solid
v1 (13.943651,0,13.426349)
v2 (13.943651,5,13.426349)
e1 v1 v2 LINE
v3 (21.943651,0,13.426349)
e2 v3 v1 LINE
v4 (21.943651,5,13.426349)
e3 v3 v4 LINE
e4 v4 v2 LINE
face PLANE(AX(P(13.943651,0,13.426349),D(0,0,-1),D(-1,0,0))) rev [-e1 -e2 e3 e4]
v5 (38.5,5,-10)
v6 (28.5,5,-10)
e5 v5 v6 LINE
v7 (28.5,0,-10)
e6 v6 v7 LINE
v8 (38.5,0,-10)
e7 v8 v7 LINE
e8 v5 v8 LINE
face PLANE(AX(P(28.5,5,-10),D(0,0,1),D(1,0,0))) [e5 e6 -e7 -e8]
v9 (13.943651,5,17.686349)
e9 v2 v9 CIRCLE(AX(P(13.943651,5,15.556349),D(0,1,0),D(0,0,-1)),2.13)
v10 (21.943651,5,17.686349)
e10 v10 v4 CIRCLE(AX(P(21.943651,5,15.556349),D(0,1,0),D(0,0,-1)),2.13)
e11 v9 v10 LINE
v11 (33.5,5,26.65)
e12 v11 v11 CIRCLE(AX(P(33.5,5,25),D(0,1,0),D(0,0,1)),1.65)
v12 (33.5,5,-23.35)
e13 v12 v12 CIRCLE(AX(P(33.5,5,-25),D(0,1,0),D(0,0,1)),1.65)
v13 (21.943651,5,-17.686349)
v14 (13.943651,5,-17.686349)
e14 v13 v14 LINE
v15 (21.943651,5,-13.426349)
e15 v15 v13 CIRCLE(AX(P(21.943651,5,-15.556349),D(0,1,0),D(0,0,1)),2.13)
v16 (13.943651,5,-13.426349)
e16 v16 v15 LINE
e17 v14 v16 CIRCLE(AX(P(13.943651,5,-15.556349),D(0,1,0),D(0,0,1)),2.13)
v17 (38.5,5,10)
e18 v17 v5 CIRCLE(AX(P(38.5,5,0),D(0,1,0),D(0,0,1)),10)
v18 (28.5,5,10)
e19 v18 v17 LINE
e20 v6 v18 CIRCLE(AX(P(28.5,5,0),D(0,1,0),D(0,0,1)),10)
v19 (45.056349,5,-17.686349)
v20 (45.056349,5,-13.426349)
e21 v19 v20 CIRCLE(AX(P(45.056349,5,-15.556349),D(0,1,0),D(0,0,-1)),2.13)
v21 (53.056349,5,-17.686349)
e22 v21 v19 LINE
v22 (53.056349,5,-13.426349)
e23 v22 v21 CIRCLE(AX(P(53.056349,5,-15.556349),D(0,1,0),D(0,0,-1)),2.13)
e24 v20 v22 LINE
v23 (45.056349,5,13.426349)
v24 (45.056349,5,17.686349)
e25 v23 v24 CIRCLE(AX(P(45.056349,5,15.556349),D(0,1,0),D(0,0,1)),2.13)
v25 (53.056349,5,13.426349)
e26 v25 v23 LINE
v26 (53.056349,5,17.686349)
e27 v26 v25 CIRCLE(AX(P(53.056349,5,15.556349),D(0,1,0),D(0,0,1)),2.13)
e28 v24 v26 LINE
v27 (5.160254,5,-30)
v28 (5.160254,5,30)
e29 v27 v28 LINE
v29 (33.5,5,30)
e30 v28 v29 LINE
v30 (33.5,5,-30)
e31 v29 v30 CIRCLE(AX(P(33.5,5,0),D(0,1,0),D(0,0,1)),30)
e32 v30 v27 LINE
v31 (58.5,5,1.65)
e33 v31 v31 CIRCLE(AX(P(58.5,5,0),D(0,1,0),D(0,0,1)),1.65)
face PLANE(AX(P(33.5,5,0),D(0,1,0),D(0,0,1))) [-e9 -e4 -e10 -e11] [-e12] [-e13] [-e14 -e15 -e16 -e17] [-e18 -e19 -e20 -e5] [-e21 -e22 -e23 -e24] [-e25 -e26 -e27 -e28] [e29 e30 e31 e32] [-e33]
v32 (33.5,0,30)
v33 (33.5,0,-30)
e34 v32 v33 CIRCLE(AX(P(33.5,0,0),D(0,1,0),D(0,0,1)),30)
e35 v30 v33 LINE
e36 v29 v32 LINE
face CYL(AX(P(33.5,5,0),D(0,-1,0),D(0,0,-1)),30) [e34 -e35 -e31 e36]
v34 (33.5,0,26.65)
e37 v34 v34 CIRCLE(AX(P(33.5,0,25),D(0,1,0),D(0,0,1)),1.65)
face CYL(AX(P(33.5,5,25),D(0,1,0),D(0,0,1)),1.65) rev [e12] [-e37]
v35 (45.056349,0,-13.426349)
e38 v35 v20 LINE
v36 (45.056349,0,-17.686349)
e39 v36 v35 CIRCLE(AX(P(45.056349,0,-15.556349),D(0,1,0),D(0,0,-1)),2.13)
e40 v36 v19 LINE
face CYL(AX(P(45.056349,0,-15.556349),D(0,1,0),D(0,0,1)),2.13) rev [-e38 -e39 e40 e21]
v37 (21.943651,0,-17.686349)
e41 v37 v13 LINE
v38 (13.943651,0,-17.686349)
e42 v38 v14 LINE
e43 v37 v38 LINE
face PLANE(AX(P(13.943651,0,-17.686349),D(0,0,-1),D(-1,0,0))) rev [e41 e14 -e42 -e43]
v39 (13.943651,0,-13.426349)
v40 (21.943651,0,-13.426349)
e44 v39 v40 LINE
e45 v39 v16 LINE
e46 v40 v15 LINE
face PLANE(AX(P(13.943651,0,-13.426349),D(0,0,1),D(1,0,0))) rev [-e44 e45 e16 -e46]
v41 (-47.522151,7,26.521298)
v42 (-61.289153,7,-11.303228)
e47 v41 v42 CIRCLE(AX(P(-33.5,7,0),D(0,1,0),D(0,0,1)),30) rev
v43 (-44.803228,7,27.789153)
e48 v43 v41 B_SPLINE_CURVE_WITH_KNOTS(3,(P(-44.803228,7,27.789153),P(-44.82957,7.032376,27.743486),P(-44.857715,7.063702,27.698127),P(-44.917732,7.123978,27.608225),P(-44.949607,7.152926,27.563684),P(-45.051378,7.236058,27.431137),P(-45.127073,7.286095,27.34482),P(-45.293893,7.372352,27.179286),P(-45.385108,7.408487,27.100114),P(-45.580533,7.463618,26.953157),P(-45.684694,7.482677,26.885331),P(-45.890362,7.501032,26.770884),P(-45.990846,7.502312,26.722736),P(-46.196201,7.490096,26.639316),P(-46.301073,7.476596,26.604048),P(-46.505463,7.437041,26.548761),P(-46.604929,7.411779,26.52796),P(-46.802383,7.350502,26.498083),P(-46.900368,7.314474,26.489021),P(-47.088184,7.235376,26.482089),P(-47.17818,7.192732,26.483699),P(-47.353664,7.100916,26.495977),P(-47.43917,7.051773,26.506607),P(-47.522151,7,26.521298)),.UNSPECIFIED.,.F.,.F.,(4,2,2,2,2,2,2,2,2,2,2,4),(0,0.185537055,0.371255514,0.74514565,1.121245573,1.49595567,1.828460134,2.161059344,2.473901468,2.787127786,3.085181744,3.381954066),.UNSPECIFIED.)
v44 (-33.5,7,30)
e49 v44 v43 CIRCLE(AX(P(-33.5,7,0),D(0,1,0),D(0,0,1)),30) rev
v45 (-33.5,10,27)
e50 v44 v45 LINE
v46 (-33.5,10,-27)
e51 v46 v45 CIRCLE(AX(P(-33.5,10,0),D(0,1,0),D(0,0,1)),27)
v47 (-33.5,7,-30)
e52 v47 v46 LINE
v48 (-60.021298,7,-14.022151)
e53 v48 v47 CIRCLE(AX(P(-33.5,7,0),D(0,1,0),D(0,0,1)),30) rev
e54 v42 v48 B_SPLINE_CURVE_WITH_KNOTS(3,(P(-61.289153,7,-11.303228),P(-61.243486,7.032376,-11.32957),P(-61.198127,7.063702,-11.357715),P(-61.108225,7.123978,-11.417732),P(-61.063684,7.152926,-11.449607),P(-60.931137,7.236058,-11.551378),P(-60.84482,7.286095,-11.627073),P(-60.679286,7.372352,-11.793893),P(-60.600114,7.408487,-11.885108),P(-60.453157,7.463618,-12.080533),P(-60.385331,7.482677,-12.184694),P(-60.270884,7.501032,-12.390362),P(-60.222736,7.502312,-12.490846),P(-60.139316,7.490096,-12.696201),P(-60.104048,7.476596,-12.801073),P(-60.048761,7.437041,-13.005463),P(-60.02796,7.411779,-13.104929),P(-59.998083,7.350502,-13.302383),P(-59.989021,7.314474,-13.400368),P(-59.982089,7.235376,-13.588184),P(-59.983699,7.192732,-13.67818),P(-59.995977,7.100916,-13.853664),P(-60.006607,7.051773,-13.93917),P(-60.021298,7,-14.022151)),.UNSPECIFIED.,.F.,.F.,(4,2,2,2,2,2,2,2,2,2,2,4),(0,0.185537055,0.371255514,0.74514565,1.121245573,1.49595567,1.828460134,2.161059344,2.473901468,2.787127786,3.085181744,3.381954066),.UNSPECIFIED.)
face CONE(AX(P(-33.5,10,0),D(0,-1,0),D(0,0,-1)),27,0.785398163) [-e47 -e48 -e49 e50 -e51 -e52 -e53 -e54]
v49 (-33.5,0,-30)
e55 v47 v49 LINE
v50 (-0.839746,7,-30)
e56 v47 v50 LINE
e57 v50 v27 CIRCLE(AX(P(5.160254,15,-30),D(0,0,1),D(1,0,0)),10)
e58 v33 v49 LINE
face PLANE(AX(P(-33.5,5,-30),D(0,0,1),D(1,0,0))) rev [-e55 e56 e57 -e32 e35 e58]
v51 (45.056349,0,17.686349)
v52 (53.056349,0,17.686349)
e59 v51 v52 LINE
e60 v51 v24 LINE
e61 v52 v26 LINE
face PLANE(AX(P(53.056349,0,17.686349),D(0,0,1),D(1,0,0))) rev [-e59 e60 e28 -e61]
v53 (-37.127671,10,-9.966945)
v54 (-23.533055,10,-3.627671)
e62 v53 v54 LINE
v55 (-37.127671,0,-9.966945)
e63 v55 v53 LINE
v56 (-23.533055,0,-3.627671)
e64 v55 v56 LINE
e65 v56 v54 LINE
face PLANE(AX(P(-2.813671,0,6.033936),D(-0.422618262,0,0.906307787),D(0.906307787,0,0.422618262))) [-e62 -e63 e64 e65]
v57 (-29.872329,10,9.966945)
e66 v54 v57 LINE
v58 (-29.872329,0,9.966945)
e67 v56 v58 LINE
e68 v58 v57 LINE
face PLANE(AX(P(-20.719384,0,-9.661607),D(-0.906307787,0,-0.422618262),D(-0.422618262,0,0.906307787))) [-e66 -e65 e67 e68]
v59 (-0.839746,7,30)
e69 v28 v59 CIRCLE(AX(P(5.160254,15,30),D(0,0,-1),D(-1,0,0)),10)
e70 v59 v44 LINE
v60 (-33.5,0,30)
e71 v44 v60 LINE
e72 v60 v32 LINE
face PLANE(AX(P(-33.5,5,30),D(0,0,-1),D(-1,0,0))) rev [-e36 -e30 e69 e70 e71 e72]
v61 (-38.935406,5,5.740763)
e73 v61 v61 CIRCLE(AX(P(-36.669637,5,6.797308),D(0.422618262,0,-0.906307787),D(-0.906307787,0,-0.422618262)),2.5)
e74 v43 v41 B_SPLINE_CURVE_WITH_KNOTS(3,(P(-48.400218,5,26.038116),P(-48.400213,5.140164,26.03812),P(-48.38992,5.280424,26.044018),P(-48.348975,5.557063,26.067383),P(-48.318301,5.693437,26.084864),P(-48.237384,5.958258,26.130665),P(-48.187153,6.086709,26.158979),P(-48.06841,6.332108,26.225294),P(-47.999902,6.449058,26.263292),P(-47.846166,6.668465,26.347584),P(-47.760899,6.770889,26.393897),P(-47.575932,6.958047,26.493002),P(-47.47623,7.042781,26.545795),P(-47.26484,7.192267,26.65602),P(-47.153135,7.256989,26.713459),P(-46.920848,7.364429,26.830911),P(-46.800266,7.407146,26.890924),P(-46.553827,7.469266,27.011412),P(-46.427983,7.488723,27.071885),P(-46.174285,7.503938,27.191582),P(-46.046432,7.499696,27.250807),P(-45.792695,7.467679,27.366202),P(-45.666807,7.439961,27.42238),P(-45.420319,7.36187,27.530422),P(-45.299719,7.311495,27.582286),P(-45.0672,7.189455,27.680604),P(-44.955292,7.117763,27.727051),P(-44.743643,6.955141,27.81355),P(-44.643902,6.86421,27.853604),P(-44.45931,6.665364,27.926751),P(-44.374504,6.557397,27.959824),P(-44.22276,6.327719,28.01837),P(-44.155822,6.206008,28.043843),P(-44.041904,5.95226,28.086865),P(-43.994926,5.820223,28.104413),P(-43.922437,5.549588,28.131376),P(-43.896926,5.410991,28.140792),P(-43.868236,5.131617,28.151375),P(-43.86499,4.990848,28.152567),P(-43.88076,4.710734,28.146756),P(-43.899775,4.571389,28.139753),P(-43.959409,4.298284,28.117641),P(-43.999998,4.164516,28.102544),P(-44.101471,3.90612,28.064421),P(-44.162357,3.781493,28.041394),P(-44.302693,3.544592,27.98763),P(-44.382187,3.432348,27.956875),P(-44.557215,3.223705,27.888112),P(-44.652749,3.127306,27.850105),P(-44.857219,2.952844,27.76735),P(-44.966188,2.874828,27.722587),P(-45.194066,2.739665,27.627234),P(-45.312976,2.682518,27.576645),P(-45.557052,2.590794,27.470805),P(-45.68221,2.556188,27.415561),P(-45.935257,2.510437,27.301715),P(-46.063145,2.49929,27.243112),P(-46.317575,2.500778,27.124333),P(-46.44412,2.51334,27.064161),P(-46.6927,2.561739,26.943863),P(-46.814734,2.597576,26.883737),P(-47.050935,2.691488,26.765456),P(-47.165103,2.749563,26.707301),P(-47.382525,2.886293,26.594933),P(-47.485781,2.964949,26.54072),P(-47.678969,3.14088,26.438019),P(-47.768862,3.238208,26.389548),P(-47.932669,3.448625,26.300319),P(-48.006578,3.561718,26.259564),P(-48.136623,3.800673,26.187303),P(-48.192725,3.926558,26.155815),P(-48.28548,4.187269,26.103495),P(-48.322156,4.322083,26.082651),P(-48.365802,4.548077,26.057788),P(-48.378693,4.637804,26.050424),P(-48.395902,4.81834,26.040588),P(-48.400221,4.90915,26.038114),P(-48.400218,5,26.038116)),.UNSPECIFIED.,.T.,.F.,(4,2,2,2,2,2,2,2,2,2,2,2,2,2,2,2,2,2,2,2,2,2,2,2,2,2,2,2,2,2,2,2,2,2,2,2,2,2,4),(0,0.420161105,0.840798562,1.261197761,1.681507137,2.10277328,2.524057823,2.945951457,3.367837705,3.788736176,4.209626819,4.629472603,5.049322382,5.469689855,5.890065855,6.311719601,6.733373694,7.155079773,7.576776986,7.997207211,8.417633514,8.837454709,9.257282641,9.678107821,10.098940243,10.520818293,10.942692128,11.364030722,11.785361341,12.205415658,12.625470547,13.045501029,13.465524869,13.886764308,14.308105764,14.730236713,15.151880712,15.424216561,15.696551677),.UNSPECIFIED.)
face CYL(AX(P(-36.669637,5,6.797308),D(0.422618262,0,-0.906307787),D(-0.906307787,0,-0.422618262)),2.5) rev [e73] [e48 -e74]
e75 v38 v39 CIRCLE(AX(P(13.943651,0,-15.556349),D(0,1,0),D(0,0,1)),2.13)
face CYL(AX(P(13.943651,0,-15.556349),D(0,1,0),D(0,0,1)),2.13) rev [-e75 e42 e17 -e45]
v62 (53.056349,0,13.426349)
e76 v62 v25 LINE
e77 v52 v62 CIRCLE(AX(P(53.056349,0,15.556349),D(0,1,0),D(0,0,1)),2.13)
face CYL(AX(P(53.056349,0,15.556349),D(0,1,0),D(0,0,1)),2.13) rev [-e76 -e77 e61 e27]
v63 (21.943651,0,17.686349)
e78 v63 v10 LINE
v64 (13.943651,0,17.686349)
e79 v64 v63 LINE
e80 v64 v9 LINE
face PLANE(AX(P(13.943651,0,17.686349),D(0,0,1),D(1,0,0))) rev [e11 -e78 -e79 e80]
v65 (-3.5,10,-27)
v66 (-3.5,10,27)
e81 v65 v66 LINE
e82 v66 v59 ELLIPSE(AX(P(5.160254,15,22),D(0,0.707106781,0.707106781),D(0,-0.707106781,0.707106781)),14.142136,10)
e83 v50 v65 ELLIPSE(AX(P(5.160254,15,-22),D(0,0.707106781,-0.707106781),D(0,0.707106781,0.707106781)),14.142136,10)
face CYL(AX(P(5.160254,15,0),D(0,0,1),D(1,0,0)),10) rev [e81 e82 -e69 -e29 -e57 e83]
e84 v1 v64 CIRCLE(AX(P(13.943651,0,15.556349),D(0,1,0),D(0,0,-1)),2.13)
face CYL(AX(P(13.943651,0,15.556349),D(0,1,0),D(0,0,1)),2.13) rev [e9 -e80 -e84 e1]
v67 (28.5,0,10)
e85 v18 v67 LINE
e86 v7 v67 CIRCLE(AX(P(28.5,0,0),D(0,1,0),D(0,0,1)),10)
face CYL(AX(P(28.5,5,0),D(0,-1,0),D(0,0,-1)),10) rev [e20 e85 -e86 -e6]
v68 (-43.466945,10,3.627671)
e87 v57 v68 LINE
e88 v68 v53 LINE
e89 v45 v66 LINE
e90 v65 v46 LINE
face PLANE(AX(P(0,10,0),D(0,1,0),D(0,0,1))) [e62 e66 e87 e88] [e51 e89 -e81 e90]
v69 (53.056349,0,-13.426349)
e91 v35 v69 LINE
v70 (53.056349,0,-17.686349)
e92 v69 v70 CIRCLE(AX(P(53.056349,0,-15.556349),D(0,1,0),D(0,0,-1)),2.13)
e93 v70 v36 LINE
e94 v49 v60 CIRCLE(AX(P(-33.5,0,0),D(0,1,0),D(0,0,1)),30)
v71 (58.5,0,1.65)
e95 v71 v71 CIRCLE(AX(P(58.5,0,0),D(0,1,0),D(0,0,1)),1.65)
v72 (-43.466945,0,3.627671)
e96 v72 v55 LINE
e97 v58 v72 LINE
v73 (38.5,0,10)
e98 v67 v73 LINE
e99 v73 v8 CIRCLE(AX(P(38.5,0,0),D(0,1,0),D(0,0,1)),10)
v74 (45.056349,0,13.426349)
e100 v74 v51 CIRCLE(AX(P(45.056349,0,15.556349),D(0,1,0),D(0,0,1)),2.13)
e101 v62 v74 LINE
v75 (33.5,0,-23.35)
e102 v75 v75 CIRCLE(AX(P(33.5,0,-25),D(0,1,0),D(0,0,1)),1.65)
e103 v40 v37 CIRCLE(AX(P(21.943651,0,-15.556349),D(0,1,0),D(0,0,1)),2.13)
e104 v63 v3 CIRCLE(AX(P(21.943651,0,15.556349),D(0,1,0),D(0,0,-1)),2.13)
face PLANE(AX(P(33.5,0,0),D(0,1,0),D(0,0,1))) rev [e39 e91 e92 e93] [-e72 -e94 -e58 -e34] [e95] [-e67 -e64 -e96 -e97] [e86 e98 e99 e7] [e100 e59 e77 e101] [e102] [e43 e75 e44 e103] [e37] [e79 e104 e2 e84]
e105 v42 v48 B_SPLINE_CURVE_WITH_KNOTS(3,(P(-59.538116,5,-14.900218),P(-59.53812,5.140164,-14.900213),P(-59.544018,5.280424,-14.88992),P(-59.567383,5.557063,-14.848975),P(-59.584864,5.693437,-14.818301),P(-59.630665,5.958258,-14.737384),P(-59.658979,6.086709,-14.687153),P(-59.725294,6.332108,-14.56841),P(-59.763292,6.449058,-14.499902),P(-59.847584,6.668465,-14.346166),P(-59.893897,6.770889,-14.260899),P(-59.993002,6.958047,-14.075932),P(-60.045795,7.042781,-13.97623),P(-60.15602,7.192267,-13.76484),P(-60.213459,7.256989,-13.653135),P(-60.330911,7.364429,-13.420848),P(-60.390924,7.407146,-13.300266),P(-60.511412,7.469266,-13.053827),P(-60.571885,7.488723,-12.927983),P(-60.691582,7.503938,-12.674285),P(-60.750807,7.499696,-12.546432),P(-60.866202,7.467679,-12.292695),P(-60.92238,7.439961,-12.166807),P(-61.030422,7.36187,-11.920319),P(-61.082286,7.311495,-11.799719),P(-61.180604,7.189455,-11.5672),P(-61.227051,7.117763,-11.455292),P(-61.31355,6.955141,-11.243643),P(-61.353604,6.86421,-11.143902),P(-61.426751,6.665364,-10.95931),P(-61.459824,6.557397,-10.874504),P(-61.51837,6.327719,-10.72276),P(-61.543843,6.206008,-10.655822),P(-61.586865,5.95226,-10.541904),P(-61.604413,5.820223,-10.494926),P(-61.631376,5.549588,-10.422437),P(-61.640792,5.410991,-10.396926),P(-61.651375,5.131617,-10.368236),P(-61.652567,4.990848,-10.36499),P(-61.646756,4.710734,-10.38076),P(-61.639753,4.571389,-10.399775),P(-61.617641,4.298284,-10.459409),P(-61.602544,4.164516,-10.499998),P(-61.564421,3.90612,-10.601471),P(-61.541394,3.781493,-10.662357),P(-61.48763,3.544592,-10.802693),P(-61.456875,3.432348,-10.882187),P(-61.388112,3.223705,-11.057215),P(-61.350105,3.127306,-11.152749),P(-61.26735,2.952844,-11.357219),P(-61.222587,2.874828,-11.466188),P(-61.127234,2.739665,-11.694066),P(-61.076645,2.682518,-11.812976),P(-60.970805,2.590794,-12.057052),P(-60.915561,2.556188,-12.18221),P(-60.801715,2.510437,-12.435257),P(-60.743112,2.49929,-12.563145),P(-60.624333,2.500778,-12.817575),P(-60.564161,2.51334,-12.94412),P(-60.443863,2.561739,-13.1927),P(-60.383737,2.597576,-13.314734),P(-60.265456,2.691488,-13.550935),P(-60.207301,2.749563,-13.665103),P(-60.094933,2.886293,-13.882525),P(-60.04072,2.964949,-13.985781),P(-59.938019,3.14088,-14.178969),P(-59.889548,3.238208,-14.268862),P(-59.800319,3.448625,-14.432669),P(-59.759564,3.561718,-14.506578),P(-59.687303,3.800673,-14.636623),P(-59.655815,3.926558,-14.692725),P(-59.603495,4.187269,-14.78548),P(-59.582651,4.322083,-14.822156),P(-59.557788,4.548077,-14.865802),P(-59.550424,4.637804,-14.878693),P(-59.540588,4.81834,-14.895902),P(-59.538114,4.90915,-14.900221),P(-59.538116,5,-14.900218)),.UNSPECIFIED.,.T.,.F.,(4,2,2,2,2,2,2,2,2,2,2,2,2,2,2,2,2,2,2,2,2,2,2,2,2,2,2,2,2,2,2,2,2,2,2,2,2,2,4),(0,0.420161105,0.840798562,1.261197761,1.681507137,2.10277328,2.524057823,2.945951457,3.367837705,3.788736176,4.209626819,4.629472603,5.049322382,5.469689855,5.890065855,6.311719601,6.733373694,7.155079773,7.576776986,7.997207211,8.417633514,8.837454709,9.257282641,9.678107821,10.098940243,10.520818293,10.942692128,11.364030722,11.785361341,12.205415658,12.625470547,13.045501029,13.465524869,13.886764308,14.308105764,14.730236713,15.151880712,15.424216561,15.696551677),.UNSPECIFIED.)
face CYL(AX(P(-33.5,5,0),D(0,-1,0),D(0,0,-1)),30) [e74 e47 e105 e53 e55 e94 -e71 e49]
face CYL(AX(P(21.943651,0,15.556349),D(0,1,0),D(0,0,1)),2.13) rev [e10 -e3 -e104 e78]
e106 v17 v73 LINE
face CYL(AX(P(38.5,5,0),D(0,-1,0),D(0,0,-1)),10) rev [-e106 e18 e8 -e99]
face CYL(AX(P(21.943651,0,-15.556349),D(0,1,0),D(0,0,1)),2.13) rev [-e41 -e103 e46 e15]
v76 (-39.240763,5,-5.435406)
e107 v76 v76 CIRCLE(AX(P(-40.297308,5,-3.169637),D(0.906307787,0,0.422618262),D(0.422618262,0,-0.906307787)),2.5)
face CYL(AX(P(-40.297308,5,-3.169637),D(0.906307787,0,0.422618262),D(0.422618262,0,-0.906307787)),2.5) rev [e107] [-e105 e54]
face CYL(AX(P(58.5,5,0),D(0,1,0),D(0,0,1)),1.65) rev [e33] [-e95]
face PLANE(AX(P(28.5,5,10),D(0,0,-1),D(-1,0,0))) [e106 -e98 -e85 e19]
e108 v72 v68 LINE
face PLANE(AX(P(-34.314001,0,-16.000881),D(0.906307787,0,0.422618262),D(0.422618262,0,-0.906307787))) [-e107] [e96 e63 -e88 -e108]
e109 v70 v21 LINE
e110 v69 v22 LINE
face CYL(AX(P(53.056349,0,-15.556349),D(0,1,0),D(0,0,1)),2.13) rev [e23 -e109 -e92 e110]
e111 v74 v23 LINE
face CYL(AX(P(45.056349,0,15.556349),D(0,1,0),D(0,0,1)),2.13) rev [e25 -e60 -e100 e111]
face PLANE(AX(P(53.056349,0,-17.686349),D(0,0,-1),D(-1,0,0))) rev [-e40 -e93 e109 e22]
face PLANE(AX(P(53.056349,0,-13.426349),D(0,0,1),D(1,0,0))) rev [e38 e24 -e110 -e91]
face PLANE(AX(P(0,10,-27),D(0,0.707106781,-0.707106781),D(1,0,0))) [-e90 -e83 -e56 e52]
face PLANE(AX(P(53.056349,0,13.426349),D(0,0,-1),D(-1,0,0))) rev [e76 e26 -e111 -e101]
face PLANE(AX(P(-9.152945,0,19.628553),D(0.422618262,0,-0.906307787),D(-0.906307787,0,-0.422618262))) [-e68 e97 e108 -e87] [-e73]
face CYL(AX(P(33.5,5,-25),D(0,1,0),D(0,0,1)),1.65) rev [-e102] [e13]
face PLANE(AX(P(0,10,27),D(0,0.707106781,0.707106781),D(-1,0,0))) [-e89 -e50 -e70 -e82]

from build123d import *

# Parameters (mm, degrees)
BOSS_EXTRUDE1_DEPTH = 5
CUT_EXTRUDE1_DEPTH  = 71.407741052
BOSS_EXTRUDE2_DEPTH = 5
FILLET1_R           = 10
CUT_EXTRUDE2_DEPTH  = 71.938353519
M4_TAPPED_HOLE1_D   = 3.3
SKETCH13_W          = 2.5
SKETCH13_H          = 32.367781463
SKETCH14_W          = 2.5
SKETCH14_H          = 32.367781463
CHAMFER1_SIZE       = 3


with BuildPart() as part:
    # Sketch1 → Boss-Extrude1 (new body)
    with BuildSketch(Plane(origin=(0, 0, 0), x_dir=(1, 0, 0), z_dir=(0, 1, 0))):
        with BuildLine():
            Line((-33.5, 30), (33.5, 30))
            ThreePointArc((33.5, 30), (63.5, 0), (33.5, -30))
            Line((33.5, -30), (-33.5, -30))
            ThreePointArc((-33.5, -30), (-63.5, 0), (-33.5, 30))
        make_face()
        with BuildLine():
            Line((28.5, 10), (38.5, 10))
            ThreePointArc((38.5, 10), (48.5, 0), (38.5, -10))
            Line((38.5, -10), (28.5, -10))
            ThreePointArc((28.5, -10), (18.5, 0), (28.5, 10))
        make_face(mode=Mode.SUBTRACT)
    extrude(amount=BOSS_EXTRUDE1_DEPTH)

    # Sketch2 → Cut-Extrude1 (cut, through all)
    with BuildSketch(Plane(origin=(0, 5, 0), x_dir=(1, 0, 0), z_dir=(0, 1, 0))):
        with BuildLine():
            Line((13.943650814, 17.686349186), (21.943650814, 17.686349186))
            ThreePointArc((21.943650814, 17.686349186), (24.073650814, 15.556349186), (21.943650814, 13.426349186))
            Line((21.943650814, 13.426349186), (13.943650814, 13.426349186))
            ThreePointArc((13.943650814, 13.426349186), (11.813650814, 15.556349186), (13.943650814, 17.686349186))
        make_face()
        with BuildLine():
            Line((53.056349186, 17.686349186), (45.056349186, 17.686349186))
            ThreePointArc((45.056349186, 17.686349186), (42.926349186, 15.556349186), (45.056349186, 13.426349186))
            Line((45.056349186, 13.426349186), (53.056349186, 13.426349186))
            ThreePointArc((53.056349186, 13.426349186), (55.186349186, 15.556349186), (53.056349186, 17.686349186))
        make_face()
        with BuildLine():
            Line((53.056349186, -17.686349186), (45.056349186, -17.686349186))
            ThreePointArc((45.056349186, -17.686349186), (42.926349186, -15.556349186), (45.056349186, -13.426349186))
            Line((45.056349186, -13.426349186), (53.056349186, -13.426349186))
            ThreePointArc((53.056349186, -13.426349186), (55.186349186, -15.556349186), (53.056349186, -17.686349186))
        make_face()
        with BuildLine():
            Line((13.943650814, -17.686349186), (21.943650814, -17.686349186))
            ThreePointArc((21.943650814, -17.686349186), (24.073650814, -15.556349186), (21.943650814, -13.426349186))
            Line((21.943650814, -13.426349186), (13.943650814, -13.426349186))
            ThreePointArc((13.943650814, -13.426349186), (11.813650814, -15.556349186), (13.943650814, -17.686349186))
        make_face()
    extrude(amount=-CUT_EXTRUDE1_DEPTH, mode=Mode.SUBTRACT)

    # Sketch8 → Boss-Extrude2 (add)
    with BuildSketch(Plane(origin=(0, 5, 0), x_dir=(1, 0, 0), z_dir=(0, 1, 0))):
        with BuildLine():
            ThreePointArc((-33.5, -30), (-12.286796564, -21.213203436), (-3.5, 0))
            ThreePointArc((-3.5, 0), (-12.286796564, 21.213203436), (-33.5, 30))
            ThreePointArc((-33.5, 30), (-63.5, 0), (-33.5, -30))
        make_face()
        with BuildLine():
            Line((-3.5, 0), (-3.5, 30))
            Line((-3.5, 30), (-33.5, 30))
            ThreePointArc((-33.5, 30), (-12.286796564, 21.213203436), (-3.5, 0))
        make_face()
        with BuildLine():
            Line((-3.5, -30), (-3.5, 0))
            ThreePointArc((-3.5, 0), (-12.286796564, -21.213203436), (-33.5, -30))
            Line((-33.5, -30), (-3.5, -30))
        make_face()
    extrude(amount=BOSS_EXTRUDE2_DEPTH)

    # Fillet1
    # the kernel refuses this fillet: 10 mm, written as the material it adds along each edge
    with BuildSketch(Plane(origin=(-3.5, 5, -30), x_dir=(0, 1, 0), z_dir=(0, 0, 1))) as fillet1_piece_1:
        with BuildLine():
            CenterArc((10, -8.660254038), FILLET1_R, 120, 60)
            Line((0, -8.660254038), (-0.2, -8.660254038))
            Line((-0.2, -8.660254038), (-0.2, 0))
            Line((-0.2, 0), (0, 0.2))
            ThreePointArc((0, 0.2), (2.5, 0.2), (4.9, 0.173205081))
            Line((4.9, 0.173205081), (5, 0))
        make_face()
    extrude(amount=60)

    # Sketch9 → Cut-Extrude2 (cut, through all)
    with BuildSketch(Plane(origin=(0, 10, 0), x_dir=(1, 0, 0), z_dir=(0, 1, 0))):
        Polygon((-43.466945366, -3.62767144), (-37.12767144, 9.966945366), (-23.533054634, 3.62767144), (-29.87232856, -9.966945366), align=None)
    extrude(amount=-CUT_EXTRUDE2_DEPTH, mode=Mode.SUBTRACT)

    # M4 Tapped Hole1 (through all)
    with Locations(Plane(origin=(0, 5, 0), x_dir=(1, 0, 0), z_dir=(0, 1, 0))):
        with Locations((33.5, 25), (33.5, -25), (58.5, 0)):
            Hole(M4_TAPPED_HOLE1_D / 2)

    # Sketch13 → M6 Tapped Hole1 (revolve, cut)
    with BuildSketch(Plane(origin=(-40.297308403, 5, -3.169636963), x_dir=(0.4226182617407039, 0, -0.9063077870366479), z_dir=(0, 1, 0))):
        with Locations((1.25, 16.183890732)):
            Rectangle(SKETCH13_W, SKETCH13_H)
    revolve(axis=Axis((-34.542253955, 5, -0.486011001), (-0.9063077870366478, 0, -0.4226182617407039)), mode=Mode.SUBTRACT)

    # Sketch14 → M6 Tapped Hole2 (revolve, cut)
    with BuildSketch(Plane(origin=(-36.669636963, 5, 6.797308403), x_dir=(-0.9063077870366478, 0, -0.42261826174070416), z_dir=(0, 1, 0))):
        with Locations((1.25, 16.183890732)):
            Rectangle(SKETCH14_W, SKETCH14_H)
    revolve(axis=Axis((-33.986011001, 5, 1.042253955), (-0.4226182617407042, 0, 0.9063077870366477)), mode=Mode.SUBTRACT)

    # Chamfer1
    # the kernel refuses this chamfer: 3 mm, written as the material it takes off along each edge
    with BuildSketch(Plane(origin=(-33.5, 10, 30), x_dir=(0, 0.02749587661058619, -0.9996219169112968), z_dir=(1, 0, 0)), Plane(origin=(4.215048964, 10, -30), x_dir=(0, 0.02749587661058619, 0.9996219169112968), z_dir=(-1, 0, 0))) as chamfer1_piece_1:
        Polygon((CHAMFER1_SIZE * 0.999621916911, -CHAMFER1_SIZE * 0.0274958766106), (-CHAMFER1_SIZE * 0.0274958766106, -CHAMFER1_SIZE * 0.999621916911), (0, 0), align=None)
    extrude(amount=37.715048964, mode=Mode.SUBTRACT)
    with BuildSketch(Plane(origin=(-33.5, 10, 0), x_dir=(0, 0, 1), z_dir=(1, 0, 0))) as chamfer1_piece_2:
        Polygon((30 - CHAMFER1_SIZE, 0), (30, CHAMFER1_SIZE), (30, 0), align=None)
    revolve(axis=Axis((-33.5, 10, 0), (0, -1, 0)), revolution_arc=180, mode=Mode.SUBTRACT)


solid = part.part
